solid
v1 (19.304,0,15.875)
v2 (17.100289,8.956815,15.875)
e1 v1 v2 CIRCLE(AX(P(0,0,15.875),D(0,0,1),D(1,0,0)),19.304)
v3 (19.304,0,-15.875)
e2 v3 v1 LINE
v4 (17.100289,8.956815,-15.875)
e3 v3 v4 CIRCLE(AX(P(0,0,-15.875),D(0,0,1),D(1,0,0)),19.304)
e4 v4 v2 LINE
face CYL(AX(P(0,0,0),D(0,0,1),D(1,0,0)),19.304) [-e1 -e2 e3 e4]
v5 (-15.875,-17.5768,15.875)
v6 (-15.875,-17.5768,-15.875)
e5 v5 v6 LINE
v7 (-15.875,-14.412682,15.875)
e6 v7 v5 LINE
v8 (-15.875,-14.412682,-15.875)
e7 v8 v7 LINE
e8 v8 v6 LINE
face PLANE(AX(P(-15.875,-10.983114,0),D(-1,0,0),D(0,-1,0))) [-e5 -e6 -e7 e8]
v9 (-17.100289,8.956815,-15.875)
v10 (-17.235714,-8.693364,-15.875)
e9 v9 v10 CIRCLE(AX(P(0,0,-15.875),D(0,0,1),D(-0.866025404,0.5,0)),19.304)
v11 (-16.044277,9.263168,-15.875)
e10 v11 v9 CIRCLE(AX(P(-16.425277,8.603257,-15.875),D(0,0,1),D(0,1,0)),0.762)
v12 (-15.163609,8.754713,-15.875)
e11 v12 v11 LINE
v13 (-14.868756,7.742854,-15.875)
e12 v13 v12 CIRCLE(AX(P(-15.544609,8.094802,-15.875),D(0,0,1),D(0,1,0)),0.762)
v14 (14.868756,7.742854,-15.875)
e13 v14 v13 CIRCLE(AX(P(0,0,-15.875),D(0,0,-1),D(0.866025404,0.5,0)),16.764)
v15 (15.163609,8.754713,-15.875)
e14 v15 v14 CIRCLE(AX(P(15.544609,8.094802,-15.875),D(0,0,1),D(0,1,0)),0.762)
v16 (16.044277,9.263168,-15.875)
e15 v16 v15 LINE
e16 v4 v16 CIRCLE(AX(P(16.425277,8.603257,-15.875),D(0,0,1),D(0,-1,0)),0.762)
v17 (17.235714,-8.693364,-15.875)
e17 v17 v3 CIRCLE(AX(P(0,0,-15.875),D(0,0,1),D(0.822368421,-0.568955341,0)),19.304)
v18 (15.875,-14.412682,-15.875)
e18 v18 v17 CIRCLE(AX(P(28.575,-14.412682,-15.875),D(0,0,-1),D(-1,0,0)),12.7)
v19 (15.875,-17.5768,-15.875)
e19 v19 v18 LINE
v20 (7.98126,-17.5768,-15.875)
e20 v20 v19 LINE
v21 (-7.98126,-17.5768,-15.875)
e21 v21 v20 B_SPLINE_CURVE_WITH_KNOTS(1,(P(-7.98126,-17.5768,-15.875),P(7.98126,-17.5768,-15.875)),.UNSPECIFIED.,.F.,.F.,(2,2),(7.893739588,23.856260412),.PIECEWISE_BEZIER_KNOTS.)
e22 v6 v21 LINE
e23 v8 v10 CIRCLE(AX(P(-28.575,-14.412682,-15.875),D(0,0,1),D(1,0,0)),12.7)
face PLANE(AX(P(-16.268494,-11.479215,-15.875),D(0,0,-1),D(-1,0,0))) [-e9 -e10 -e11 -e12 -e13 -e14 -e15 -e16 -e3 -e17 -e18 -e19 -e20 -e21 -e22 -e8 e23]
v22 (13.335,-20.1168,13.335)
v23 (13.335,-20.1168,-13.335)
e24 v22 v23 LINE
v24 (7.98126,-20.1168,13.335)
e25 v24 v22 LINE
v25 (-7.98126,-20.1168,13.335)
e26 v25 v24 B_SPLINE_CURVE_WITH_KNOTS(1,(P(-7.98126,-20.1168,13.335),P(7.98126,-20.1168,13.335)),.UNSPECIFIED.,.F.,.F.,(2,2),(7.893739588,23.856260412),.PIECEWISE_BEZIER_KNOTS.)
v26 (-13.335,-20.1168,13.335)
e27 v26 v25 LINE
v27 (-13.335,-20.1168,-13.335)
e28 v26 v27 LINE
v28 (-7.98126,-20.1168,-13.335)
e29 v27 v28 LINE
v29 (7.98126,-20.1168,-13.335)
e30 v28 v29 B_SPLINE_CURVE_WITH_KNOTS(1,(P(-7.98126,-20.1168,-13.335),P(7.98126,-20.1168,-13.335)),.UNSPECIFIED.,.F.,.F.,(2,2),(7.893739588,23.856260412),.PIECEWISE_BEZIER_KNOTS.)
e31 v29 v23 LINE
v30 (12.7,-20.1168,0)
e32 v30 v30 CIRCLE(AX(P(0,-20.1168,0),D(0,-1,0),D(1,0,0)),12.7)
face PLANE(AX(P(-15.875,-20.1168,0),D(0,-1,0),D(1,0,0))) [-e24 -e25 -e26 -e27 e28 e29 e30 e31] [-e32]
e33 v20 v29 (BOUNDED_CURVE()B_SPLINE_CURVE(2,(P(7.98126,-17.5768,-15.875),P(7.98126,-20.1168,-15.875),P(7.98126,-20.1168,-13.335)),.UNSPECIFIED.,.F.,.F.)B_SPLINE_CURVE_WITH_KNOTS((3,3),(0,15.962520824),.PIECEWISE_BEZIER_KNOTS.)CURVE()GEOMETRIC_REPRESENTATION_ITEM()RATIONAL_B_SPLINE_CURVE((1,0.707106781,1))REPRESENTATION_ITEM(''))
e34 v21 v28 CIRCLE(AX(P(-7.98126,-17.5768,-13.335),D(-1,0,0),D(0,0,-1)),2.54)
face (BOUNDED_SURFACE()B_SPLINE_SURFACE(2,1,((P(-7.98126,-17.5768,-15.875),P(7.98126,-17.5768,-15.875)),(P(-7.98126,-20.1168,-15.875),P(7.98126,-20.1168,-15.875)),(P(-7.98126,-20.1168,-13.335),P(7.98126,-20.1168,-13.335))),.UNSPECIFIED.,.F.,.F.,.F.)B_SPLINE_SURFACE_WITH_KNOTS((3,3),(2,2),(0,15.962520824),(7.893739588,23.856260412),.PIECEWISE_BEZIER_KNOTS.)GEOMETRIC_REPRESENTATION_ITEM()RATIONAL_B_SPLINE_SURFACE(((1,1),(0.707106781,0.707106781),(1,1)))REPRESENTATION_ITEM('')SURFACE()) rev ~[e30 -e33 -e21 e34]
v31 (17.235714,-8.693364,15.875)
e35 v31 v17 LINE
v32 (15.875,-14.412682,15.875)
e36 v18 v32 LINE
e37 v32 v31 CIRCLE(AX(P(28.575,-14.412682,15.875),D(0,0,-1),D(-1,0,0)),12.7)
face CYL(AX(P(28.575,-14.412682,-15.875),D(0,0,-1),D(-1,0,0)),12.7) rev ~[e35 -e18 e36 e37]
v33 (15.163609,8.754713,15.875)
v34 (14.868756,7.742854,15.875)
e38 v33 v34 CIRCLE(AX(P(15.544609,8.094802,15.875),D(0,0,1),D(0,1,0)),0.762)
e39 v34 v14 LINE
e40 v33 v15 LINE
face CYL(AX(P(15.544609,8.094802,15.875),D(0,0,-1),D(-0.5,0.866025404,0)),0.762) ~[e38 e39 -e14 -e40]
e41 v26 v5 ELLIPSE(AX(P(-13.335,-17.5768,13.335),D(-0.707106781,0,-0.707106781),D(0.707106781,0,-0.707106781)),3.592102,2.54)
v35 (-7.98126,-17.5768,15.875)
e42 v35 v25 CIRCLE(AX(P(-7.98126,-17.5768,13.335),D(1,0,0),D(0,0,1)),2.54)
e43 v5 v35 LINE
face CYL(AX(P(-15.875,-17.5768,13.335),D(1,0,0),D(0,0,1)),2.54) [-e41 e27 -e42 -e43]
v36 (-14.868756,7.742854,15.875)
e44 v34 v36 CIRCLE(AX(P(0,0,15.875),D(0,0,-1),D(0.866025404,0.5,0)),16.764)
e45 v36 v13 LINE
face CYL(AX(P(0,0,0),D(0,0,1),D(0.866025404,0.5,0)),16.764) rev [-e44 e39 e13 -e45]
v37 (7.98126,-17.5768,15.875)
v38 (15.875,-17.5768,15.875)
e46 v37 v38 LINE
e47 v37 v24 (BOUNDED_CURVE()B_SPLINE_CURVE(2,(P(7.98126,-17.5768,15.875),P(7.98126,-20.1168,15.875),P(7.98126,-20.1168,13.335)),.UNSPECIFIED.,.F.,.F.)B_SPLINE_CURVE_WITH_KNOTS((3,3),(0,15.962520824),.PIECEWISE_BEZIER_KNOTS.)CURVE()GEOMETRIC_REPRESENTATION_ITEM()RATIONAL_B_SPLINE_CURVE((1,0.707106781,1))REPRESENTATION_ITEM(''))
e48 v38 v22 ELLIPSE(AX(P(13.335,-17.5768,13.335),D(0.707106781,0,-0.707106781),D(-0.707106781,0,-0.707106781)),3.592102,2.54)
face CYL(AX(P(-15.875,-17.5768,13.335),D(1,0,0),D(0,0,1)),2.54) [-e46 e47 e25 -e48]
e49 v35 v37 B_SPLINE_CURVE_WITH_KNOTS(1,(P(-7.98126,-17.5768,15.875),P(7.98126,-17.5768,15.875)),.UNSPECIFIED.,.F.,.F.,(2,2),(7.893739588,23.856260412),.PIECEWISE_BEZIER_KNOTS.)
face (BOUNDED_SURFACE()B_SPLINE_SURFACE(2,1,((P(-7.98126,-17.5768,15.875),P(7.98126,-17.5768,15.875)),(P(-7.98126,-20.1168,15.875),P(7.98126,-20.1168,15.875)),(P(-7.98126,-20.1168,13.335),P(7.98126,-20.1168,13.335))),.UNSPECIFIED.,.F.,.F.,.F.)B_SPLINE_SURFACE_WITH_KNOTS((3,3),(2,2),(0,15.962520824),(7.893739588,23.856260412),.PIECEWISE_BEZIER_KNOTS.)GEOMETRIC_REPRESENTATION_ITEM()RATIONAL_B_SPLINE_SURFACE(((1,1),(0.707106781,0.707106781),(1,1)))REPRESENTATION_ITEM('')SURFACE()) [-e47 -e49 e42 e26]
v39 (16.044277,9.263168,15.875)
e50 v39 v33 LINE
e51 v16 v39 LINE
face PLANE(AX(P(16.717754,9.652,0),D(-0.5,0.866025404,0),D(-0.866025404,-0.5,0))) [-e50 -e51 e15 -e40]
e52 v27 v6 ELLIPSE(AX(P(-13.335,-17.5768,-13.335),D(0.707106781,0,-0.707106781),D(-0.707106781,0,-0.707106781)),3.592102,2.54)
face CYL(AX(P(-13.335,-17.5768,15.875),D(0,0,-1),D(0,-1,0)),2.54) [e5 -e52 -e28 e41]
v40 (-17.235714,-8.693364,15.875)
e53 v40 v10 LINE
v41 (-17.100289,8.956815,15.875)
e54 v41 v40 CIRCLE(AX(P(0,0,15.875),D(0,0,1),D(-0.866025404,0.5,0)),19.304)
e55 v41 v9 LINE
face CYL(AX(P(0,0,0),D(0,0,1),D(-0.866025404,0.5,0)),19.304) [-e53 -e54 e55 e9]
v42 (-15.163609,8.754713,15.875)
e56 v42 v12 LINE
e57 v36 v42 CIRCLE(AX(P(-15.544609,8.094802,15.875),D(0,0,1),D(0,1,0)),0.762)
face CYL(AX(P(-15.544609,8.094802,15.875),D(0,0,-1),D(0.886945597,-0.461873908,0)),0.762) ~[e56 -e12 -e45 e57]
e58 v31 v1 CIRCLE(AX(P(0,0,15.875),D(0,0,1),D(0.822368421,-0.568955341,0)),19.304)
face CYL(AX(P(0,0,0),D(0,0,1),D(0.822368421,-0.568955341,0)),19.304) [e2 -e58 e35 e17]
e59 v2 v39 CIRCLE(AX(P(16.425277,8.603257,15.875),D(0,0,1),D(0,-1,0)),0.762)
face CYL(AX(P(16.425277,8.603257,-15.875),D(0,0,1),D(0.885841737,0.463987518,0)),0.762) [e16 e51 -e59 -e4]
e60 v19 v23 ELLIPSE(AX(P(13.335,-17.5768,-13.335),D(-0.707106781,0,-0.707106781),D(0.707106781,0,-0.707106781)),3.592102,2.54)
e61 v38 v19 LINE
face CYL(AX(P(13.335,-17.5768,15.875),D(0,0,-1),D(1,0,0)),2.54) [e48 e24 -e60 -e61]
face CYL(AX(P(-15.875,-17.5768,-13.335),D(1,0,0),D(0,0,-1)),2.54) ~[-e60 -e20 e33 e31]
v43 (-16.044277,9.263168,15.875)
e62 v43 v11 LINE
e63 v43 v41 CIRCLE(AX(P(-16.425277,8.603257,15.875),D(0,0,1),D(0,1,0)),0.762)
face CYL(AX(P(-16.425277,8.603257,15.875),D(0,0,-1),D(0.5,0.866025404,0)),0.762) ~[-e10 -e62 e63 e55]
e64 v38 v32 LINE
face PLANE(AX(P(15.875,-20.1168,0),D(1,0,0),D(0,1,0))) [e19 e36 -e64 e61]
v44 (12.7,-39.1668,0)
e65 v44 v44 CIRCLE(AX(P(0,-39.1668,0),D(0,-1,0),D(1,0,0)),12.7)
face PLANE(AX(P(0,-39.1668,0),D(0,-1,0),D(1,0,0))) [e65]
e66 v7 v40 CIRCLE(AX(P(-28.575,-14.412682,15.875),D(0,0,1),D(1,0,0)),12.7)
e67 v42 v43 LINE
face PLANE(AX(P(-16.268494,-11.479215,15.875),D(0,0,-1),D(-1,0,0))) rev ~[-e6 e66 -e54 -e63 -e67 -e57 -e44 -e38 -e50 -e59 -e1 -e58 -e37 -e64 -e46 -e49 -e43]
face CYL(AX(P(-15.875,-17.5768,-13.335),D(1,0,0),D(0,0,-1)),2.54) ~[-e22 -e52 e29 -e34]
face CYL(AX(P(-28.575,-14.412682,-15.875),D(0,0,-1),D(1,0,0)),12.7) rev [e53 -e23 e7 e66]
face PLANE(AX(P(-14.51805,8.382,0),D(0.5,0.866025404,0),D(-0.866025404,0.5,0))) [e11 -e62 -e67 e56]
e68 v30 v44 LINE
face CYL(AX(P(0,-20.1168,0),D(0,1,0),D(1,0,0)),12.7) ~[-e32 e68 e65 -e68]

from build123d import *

# Parameters (mm, degrees)
F1_DEPTH    = 15.875
F2_DEPTH    = 15.875
F3_R        = 12.7
F4_DEPTH    = 19.05
F5_R        = 2.54
F6_T1_DEPTH = 31.75
F7_R        = 0.762


# Not quite as in the source:
# - a fillet or chamfer that OpenCascade refuses, or shapes differently, is made with other operations: its cross-section is extruded or revolved along the edge and cut away or added


with BuildPart() as f1:
    # F0 (on Top) → F1 (new body, symmetric)
    with BuildSketch(Plane.XY):
        with BuildLine():
            ThreePointArc((15.875, -10.9831139027), (18.4268203443, -5.7529738397), (19.304, 0))
            ThreePointArc((19.304, 0), (18.6462321507, 4.9962428467), (16.7177543947, 9.652))
            Line((16.7177543947, 9.652), (14.518049869, 8.382))
            ThreePointArc((14.518049869, 8.382), (16.1927805519, 4.3388424721), (16.764, 0))
            ThreePointArc((16.764, 0), (-4.3388424721, -16.1927805519), (-14.518049869, 8.382))
            Line((-14.518049869, 8.382), (-16.7177543947, 9.652))
            ThreePointArc((-16.7177543947, 9.652), (-19.2879208626, -0.7877339639), (-15.875, -10.9831139027))
            ThreePointArc((-15.875, -10.9831139027), (0, -19.304), (15.875, -10.9831139027))
        make_face()
    extrude(amount=F1_DEPTH, both=True)

    # F0 (on Top) → F2 (join, symmetric)
    with BuildSketch(Plane.XY):
        with BuildLine():
            Line((15.875, -20.1168), (15.875, -10.9831139027))
            ThreePointArc((15.875, -10.9831139027), (0, -19.304), (-15.875, -10.9831139027))
            Line((-15.875, -10.9831139027), (-15.875, -20.1168))
            Line((-15.875, -20.1168), (15.875, -20.1168))
        make_face()
    extrude(amount=F2_DEPTH, both=True)

    # F3 (on face) → F4 (join)
    with BuildSketch(Plane.XZ.offset(20.1168)):
        Circle(F3_R)
    extrude(amount=F4_DEPTH)

    # F5
    f5_edges = [f1.edges().sort_by_distance(p)[0] for p in [
        (-15.875, -20.1168, 0),
        (15.875, -20.1168, 0),
        (0, -20.1168, 15.875),
        (0, -20.1168, -15.875),
    ]]
    fillet(f5_edges, radius=F5_R)

    # F6: fillet of radius 12.7 on 2 edges, made by hand

    # F6_s2 → F6_t1 (join)
    with BuildSketch(Plane.XY.offset(-15.875)):
        with BuildLine():
            ThreePointArc((-15.875, -14.4126816034), (-16.2198608148, -11.4732027866), (-17.2357142857, -8.6933635068))
            ThreePointArc((-17.2357142857, -8.6933635068), (-16.594896485, -9.8617354788), (-15.875, -10.9831139027))
            Line((-15.875, -10.9831139027), (-15.875, -14.4126816034))
        make_face()
        with BuildLine():
            ThreePointArc((15.875, -14.4126816034), (16.2198608148, -11.4732027866), (17.2357142857, -8.6933635068))
            ThreePointArc((17.2357142857, -8.6933635068), (16.594896485, -9.8617354788), (15.875, -10.9831139027))
            Line((15.875, -10.9831139027), (15.875, -14.4126816034))
        make_face()
    extrude(amount=F6_T1_DEPTH)

    # F7
    f7_edges = [f1.edges().sort_by_distance(p)[0] for p in [
        (-16.717754, 9.652, 0),
        (-14.51805, 8.382, 0),
        (16.717754, 9.652, 0),
        (14.51805, 8.382, 0),
    ]]
    fillet(f7_edges, radius=F7_R)


solid = f1.part
